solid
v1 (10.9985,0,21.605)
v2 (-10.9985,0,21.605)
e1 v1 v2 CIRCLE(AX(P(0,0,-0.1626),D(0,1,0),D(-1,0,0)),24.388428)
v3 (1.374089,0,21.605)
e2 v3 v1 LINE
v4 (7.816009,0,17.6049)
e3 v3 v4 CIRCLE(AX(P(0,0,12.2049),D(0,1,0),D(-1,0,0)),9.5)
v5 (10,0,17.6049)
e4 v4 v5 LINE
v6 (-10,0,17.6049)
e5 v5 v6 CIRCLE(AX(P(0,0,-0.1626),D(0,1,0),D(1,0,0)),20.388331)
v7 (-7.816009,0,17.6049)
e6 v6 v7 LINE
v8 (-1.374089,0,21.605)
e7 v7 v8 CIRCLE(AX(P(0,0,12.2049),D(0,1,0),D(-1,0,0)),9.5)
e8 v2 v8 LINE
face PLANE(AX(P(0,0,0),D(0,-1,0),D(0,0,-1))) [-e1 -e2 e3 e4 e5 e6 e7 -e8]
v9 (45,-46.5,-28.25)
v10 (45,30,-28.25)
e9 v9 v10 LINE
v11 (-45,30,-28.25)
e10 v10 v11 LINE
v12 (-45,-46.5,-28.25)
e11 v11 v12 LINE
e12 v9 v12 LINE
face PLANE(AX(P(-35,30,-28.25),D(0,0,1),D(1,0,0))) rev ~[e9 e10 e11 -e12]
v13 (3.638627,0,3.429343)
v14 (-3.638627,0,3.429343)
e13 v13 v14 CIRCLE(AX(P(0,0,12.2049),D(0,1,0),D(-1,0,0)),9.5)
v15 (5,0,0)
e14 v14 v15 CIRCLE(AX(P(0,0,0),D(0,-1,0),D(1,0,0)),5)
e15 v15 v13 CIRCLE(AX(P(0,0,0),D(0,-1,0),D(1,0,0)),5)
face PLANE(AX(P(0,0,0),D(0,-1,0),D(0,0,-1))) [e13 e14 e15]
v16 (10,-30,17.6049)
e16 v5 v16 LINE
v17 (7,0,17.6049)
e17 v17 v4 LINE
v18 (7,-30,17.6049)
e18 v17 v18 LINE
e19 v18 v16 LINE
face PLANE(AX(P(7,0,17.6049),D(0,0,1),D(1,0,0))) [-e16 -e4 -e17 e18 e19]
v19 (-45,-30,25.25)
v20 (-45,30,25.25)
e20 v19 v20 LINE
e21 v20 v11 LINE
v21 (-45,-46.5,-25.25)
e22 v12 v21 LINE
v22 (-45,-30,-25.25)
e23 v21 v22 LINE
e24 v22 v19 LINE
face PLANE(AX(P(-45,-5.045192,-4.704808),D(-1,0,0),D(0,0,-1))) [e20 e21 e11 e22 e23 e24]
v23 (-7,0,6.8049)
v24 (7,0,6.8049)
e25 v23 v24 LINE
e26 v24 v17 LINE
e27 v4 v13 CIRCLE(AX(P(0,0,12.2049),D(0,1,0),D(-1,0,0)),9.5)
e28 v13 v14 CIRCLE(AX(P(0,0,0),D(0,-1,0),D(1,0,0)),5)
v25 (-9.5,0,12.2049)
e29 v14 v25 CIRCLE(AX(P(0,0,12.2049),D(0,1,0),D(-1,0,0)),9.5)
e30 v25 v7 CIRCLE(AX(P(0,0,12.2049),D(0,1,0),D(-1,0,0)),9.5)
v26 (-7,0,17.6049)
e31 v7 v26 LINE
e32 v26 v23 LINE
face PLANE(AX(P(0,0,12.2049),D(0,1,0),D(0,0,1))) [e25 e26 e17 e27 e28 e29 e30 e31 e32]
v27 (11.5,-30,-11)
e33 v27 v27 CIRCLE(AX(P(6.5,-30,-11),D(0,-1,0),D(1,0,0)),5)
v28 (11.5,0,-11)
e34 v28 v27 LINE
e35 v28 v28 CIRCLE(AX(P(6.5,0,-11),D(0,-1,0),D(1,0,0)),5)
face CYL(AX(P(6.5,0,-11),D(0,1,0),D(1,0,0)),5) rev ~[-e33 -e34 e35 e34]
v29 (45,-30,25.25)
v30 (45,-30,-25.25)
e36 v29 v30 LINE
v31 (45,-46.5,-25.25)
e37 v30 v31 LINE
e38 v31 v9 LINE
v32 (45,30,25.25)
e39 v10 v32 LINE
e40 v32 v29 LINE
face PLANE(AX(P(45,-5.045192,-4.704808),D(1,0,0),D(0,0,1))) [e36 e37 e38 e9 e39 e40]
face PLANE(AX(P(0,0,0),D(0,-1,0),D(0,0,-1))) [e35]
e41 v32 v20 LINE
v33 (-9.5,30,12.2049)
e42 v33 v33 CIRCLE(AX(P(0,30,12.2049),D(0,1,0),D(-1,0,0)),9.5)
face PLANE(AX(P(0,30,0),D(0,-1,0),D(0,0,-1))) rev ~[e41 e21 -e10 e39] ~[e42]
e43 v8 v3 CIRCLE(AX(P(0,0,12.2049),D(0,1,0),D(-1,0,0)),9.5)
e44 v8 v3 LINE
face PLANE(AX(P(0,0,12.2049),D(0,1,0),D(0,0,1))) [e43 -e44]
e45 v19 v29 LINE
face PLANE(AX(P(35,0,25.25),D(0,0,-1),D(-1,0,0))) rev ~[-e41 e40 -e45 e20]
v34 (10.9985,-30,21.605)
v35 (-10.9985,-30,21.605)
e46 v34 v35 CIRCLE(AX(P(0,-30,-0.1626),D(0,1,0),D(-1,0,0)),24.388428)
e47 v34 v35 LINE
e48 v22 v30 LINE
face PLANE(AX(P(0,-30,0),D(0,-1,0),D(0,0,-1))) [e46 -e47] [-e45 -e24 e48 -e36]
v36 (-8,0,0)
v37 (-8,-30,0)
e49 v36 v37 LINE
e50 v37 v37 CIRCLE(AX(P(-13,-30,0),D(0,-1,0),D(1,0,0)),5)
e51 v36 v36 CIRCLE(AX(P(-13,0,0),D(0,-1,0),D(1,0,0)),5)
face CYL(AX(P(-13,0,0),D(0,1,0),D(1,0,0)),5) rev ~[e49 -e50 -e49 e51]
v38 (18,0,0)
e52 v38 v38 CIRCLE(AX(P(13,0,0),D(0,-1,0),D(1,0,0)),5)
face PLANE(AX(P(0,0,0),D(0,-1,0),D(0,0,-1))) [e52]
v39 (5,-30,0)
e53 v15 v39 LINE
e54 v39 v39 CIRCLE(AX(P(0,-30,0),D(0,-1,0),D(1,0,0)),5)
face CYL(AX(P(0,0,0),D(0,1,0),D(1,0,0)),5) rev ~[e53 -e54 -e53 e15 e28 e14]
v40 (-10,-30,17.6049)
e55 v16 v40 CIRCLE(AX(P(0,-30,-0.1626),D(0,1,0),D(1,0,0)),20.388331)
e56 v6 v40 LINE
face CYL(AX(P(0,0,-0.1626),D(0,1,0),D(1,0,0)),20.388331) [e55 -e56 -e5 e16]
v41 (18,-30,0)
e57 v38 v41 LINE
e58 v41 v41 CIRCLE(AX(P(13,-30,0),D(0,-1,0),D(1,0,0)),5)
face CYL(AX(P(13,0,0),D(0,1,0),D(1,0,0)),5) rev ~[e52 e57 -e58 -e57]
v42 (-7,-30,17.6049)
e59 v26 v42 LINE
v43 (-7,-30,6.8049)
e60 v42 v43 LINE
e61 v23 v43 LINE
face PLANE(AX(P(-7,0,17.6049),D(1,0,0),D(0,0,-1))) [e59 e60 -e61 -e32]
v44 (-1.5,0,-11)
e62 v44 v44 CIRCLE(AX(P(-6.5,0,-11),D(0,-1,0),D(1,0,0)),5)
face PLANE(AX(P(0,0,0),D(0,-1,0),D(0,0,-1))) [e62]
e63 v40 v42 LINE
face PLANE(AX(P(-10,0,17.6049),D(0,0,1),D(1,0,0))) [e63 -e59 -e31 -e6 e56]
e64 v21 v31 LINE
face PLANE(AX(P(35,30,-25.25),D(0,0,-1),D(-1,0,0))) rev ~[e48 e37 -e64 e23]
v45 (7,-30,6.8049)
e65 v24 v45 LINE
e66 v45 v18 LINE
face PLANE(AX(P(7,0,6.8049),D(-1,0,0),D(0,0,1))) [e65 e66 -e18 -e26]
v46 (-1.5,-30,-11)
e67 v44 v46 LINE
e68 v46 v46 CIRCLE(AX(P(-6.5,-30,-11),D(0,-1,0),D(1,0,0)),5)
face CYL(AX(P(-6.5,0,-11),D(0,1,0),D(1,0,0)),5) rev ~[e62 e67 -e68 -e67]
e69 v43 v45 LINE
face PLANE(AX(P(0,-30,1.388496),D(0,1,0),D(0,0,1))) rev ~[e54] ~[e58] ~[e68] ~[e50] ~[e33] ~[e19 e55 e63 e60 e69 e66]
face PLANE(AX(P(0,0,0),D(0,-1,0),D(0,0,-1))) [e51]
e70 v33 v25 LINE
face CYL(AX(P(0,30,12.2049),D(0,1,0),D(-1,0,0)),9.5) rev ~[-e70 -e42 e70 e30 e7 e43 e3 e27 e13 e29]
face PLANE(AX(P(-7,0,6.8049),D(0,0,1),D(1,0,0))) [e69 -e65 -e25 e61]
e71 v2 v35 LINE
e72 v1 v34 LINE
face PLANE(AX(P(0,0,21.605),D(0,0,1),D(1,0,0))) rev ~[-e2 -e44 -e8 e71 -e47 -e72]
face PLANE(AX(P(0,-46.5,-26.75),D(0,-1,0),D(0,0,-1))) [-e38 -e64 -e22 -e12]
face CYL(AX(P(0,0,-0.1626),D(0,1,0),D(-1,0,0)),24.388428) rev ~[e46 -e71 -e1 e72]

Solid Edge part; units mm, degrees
sketch "Sketch1" plane through (0, 0, 0) normal (0, -1, 0) x (1, 0, 0)
  line L0 (7, 6.8049) -> (7, 17.6049)
  line L1 (7, 17.6049) -> (10, 17.6049)
  arc A0 (10, 17.6049) -> (-10, 17.6049) centre (0, -0.1626) cw
  line L2 (-10, 17.6049) -> (-7, 17.6049)
  line L3 (-7, 17.6049) -> (-7, 6.8049)
  line L4 (-7, 6.8049) -> (7, 6.8049)
  circle A1 centre (13, 0) radius 5
  circle A2 centre (0, 0) radius 5
  circle A3 centre (6.5, -11) radius 5
  circle A4 centre (-13, 0) radius 5
  circle A5 centre (-6.5, -11) radius 5
extrude "Protrusion1" add sketch "Sketch1" along normal blind 30
sketch "Sketch2" plane through (0, 0, -1.473) normal (0, 1, 0) x (-1, 0, 0)
  line L0 (0, 23.078) -> (-10.9985, 23.078)
  arc A0 (-10.9985, 23.078) -> (10.9985, 23.078) centre (0, 1.3104) ccw
  line L1 (10.9985, 23.078) -> (0, 23.078)
  line L2 (-35, 26.723) -> (35, 26.723)
  line L3 (35, 26.723) -> (35, -23.777)
  line L4 (35, -23.777) -> (-35, -23.777)
  line L5 (-35, -23.777) -> (-35, 26.723)
  dimension "D1" = 4
extrude "Protrusion2" add sketch "Sketch2" against normal blind 30
sketch "Sketch3" plane through (0, 0, 0) normal (0, -1, 0) x (1, 0, 0)
  line L0 (35, 25.25) -> (-35, 25.25)
  line L1 (-35, 25.25) -> (-35, -25.25)
  line L2 (-35, -25.25) -> (35, -25.25)
  line L3 (35, -25.25) -> (35, 25.25)
extrude "Protrusion3" add sketch "Sketch3" against normal blind 30
sketch "Sketch4" plane through (0, 30, 0) normal (0, 1, 0) x (-1, 0, 0)
  circle A0 centre (0, 12.2049) radius 9.5
extrude "Cutout1" cut sketch "Sketch4" against normal blind 30
sketch "Sketch5" plane through (0, 30, 0) normal (0, 1, 0) x (-1, 0, 0)
  line L0 (35, -28.25) -> (-35, -28.25)
  line L1 (-35, -28.25) -> (-35, -25.25)
  line L2 (-35, -25.25) -> (35, -25.25)
  line L3 (35, -25.25) -> (35, -28.25)
extrude "Protrusion4" add sketch "Sketch5" against normal blind 76.5
sketch "Sketch6" plane through (35, -8.25, -1.5) normal (1, 0, 0) x (0, 1, 0)
  line L0 (-21.75, 26.75) -> (-21.75, -23.75)
  line L1 (-21.75, -23.75) -> (-38.25, -23.75)
  line L2 (-38.25, -23.75) -> (-38.25, -26.75)
  line L3 (-38.25, -26.75) -> (38.25, -26.75)
  line L4 (38.25, -26.75) -> (38.25, 26.75)
  line L5 (38.25, 26.75) -> (-21.75, 26.75)
extrude "Protrusion5" add sketch "Sketch6" along normal blind 10
sketch "Sketch7" plane through (-35, -8.25, -1.5) normal (-1, 0, 0) x (0, -1, 0)
  line L0 (21.75, -23.75) -> (21.75, 26.75)
  line L1 (21.75, 26.75) -> (-38.25, 26.75)
  line L2 (-38.25, 26.75) -> (-38.25, -26.75)
  line L3 (-38.25, -26.75) -> (38.25, -26.75)
  line L4 (38.25, -26.75) -> (38.25, -23.75)
  line L5 (38.25, -23.75) -> (21.75, -23.75)
extrude "Protrusion6" add sketch "Sketch7" along normal blind 10
